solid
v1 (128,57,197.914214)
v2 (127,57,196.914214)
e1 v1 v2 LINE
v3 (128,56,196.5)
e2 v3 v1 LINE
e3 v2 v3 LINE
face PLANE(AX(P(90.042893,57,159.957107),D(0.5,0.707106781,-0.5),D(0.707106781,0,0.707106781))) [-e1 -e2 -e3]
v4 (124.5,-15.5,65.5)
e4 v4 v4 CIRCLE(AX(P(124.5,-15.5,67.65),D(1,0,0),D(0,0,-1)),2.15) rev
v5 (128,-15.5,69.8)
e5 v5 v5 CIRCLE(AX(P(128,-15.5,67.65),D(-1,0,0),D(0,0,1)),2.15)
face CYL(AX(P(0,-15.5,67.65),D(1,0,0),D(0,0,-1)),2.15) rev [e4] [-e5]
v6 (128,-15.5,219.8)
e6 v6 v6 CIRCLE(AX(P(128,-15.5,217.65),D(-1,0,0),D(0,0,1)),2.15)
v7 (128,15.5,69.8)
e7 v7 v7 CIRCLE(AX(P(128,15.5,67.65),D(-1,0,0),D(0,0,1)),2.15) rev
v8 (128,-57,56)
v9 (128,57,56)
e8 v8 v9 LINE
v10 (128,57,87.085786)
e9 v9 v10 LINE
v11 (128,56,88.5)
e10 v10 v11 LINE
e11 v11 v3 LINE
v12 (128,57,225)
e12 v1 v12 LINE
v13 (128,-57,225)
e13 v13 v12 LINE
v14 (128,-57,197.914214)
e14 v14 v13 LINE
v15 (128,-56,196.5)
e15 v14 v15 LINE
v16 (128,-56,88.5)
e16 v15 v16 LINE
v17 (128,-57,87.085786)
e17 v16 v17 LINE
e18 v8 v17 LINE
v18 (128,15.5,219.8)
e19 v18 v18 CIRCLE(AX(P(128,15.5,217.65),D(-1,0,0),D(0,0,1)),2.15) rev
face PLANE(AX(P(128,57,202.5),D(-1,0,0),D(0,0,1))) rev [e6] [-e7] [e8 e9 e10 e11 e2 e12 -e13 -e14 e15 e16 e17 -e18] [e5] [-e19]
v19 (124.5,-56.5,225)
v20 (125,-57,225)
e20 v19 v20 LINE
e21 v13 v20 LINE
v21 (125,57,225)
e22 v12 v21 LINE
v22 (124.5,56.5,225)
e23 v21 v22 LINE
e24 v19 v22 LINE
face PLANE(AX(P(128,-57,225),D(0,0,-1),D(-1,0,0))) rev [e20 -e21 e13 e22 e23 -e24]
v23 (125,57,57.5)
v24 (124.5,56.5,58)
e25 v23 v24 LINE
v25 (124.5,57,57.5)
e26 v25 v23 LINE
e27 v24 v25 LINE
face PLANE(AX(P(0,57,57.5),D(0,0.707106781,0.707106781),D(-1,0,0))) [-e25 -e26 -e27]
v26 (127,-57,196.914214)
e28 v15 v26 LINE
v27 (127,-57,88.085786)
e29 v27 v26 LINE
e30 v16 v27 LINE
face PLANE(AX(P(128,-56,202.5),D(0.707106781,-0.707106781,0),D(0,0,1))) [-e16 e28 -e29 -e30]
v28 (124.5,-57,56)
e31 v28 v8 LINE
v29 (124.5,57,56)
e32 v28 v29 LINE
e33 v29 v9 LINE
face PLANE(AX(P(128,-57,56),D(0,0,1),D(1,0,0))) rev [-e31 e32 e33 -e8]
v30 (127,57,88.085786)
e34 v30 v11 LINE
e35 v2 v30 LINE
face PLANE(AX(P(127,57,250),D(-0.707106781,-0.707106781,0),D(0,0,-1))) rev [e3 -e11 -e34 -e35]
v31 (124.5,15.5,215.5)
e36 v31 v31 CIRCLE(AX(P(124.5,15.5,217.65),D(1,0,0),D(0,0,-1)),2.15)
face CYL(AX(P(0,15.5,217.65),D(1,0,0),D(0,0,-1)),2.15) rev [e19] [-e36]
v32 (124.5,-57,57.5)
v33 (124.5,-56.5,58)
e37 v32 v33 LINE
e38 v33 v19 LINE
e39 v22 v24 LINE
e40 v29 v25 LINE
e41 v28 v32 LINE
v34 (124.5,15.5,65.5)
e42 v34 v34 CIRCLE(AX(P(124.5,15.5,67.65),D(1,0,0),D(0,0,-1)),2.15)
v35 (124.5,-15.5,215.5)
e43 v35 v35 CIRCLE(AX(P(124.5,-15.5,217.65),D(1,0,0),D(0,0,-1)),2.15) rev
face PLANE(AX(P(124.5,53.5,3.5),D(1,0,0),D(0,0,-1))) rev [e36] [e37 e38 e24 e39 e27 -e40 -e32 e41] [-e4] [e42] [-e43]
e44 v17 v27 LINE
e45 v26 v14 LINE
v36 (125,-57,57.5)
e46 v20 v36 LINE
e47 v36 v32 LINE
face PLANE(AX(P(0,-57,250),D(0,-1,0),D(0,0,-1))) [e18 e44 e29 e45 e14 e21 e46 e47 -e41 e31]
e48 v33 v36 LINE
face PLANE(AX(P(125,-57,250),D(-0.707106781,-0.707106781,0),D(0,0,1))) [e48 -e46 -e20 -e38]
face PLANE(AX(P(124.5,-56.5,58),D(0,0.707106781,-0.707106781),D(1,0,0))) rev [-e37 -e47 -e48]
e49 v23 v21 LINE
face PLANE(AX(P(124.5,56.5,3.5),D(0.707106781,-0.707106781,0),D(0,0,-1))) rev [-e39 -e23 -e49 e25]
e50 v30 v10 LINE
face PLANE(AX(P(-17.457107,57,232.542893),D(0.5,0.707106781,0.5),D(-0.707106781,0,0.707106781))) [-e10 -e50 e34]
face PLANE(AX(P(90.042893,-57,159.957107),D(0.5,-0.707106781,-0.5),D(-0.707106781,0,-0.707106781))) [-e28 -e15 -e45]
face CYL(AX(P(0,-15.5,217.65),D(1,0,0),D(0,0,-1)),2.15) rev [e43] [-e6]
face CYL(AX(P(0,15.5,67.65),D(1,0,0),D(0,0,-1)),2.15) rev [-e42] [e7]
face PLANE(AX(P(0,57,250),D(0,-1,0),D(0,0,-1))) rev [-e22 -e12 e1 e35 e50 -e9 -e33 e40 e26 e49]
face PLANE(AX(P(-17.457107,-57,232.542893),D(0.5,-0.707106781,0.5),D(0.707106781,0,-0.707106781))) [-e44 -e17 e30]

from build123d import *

# Parameters (mm, degrees)
SKETCH1_W                = 134
SKETCH1_H                = 57
BOSS_EXTRUDE1_DEPTH      = 250
SKETCH2_W                = 115
SKETCH2_H                = 53.5
CUT_EXTRUDE1_DEPTH       = 246.5
SKETCH3_W                = 115
SKETCH3_H                = 194
CUT_EXTRUDE2_DEPTH       = 3.5
SKETCH4_W                = 6
SKETCH4_H                = 120
CUT_EXTRUDE3_DEPTH       = 290.318163965
CHAMFER1_SIZE            = 6
SKETCH5_R                = 2.15
CUT_EXTRUDE4_DEPTH       = 134
SKETCH6_W                = 25
SKETCH6_H                = 4.5
BOSS_EXTRUDE2_DEPTH      = 115
SKETCH7_R                = 3.65
CUT_EXTRUDE5_DEPTH       = 3.6
CUT_EXTRUDE6_START       = -3.6
SKETCH8_R                = 3.65
CUT_EXTRUDE6_DEPTH       = 3.6
CHAMFER1_OF_MIRROR1_SIZE = 6
SKETCH9_R                = 1.65
CUT_EXTRUDE7_DEPTH       = 25
CHAMFER3_SIZE            = 0.5
CUT_EXTRUDE9_DEPTH       = 306.69919856
CHAMFER4_SIZE            = 0.5
SKETCH12_W               = 0.5
SKETCH12_H               = 2
BOSS_EXTRUDE3_DEPTH      = 114
CHAMFER5_SIZE            = 0.5


# Some blends are built 0.0001 mm under size
with BuildPart() as part:
    # Sketch1 → Boss-Extrude1 (new body)
    with BuildSketch(Plane.XY):
        with Locations((67, 28.5)):
            Rectangle(SKETCH1_W, SKETCH1_H)
    boss_extrude1 = extrude(amount=BOSS_EXTRUDE1_DEPTH)

    # Sketch2 → Cut-Extrude1 (cut)
    with BuildSketch(Plane.XY.offset(250)):
        with Locations((67, 26.75)):
            Rectangle(SKETCH2_W, SKETCH2_H)
    cut_extrude1 = extrude(amount=-CUT_EXTRUDE1_DEPTH, mode=Mode.SUBTRACT)

    # Sketch3 → Cut-Extrude2 (cut)
    with BuildSketch(Plane(origin=(0, 57, 0), x_dir=(1, 0, 0), z_dir=(0, 1, 0))):
        with Locations((67, -153)):
            Rectangle(SKETCH3_W, SKETCH3_H)
    cut_extrude2 = extrude(amount=-CUT_EXTRUDE2_DEPTH, mode=Mode.SUBTRACT)

    # Sketch4 → Cut-Extrude3 (cut, through all)
    with BuildSketch(Plane.XZ):
        with Locations((3, 142.5)):
            Rectangle(SKETCH4_W, SKETCH4_H)
        with Locations((131, 142.5)):
            Rectangle(SKETCH4_W, SKETCH4_H)
    cut_extrude3 = extrude(amount=-CUT_EXTRUDE3_DEPTH, mode=Mode.SUBTRACT)

    # Chamfer1
    chamfer1_edges = [part.edges().sort_by_distance(p)[0] for p in [
        (6, 28.5, 202.5),
        (6, 28.5, 82.5),
        (128, 28.5, 82.5),
        (128, 28.5, 202.5),
    ]]
    chamfer(chamfer1_edges, length=CHAMFER1_SIZE - 0.0001)  # a hair under: the kernel refuses the full size

    # Sketch5 → Cut-Extrude4 (cut)
    with BuildSketch(Plane(origin=(134, 0, 0), x_dir=(0, 0, -1), z_dir=(1, 0, 0))):
        with Locations((-217.65, 15.5)):
            Circle(SKETCH5_R)
        with Locations((-67.65, 15.5)):
            Circle(SKETCH5_R)
    cut_extrude4 = extrude(amount=-CUT_EXTRUDE4_DEPTH, mode=Mode.SUBTRACT)

    # Sketch6 → Boss-Extrude2 (add)
    with BuildSketch(Plane(origin=(9.5, 0, 0), x_dir=(0, 0, -1), z_dir=(1, 0, 0))):
        with Locations((-237.5, 2.25)):
            Rectangle(SKETCH6_W, SKETCH6_H)
    boss_extrude2 = extrude(amount=BOSS_EXTRUDE2_DEPTH)

    # Sketch7 → Cut-Extrude5 (cut)
    with BuildSketch(Plane(origin=(134, 0, 0), x_dir=(0, 0, -1), z_dir=(1, 0, 0))):
        with Locations((-217.65, 15.5)):
            Circle(SKETCH7_R)
        with Locations((-67.65, 15.5)):
            Circle(SKETCH7_R)
    cut_extrude5 = extrude(amount=-CUT_EXTRUDE5_DEPTH, mode=Mode.SUBTRACT)

    # Sketch8 → Cut-Extrude6 (cut)
    with BuildSketch(Plane.ZY.offset(CUT_EXTRUDE6_START)):
        with Locations(Location((217.65, 15.5, 0), (0, 0, 180))):
            Circle(SKETCH8_R)
        with Locations(Location((67.65, 15.5, 0), (0, 0, 180))):
            Circle(SKETCH8_R)
    cut_extrude6 = extrude(amount=CUT_EXTRUDE6_DEPTH, mode=Mode.SUBTRACT)


with BuildPart() as mirror1_1:
    # Mirror1: Boss-Extrude1 across plane
    add(boss_extrude1.mirror(Plane.ZX))

    # Mirror1 2: Cut-Extrude1, Cut-Extrude2, Cut-Extrude3, Cut-Extrude4 across plane
    add(cut_extrude1.mirror(Plane.ZX), mode=Mode.SUBTRACT)
    add(cut_extrude2.mirror(Plane.ZX), mode=Mode.SUBTRACT)
    add(cut_extrude3.mirror(Plane.ZX), mode=Mode.SUBTRACT)
    add(cut_extrude4.mirror(Plane.ZX), mode=Mode.SUBTRACT)

    # Mirror1 4: Cut-Extrude5, Cut-Extrude6 across plane
    add(cut_extrude5.mirror(Plane.ZX), mode=Mode.SUBTRACT)
    add(cut_extrude6.mirror(Plane.ZX), mode=Mode.SUBTRACT)

    # Chamfer1 of Mirror1
    chamfer1_of_mirror1_edges = [mirror1_1.edges().sort_by_distance(p)[0] for p in [
        (6, -28.5, 202.5),
        (6, -28.5, 82.5),
        (128, -28.5, 82.5),
        (128, -28.5, 202.5),
    ]]
    chamfer(chamfer1_of_mirror1_edges, length=CHAMFER1_OF_MIRROR1_SIZE - 0.0001)  # a hair under: the kernel refuses the full size


with BuildPart() as mirror1_3_1:
    # Mirror1 3: Boss-Extrude2 across plane
    add(boss_extrude2.mirror(Plane.ZX))


with BuildPart() as part_1:
    add(part.part)

    # Mirror1 united with what the copies touc: union Mirror1_1, Mirror1 3_1
    add(mirror1_1.part)
    add(mirror1_3_1.part)

    # Sketch9 → Cut-Extrude7 (cut)
    with BuildSketch(Plane.XY.offset(250)):
        with Locations((25, 0)):
            Circle(SKETCH9_R)
        with Locations((109, 0)):
            Circle(SKETCH9_R)
    extrude(amount=-CUT_EXTRUDE7_DEPTH, mode=Mode.SUBTRACT)

    # Chamfer2
    # the kernel refuses this chamfer: 1 mm, written as the material it takes off along each edge
    with BuildSketch(Plane(origin=(133.333333333, -56.333333333, 0.666666667), x_dir=(-0.7071067811865475, -0.7071067811865475, 0), z_dir=(0.5773502691896257, -0.5773502691896258, -0.5773502691896258))) as chamfer2_piece_1:
        Polygon((-0.707106781, -0.40824829), (0.707106781, -0.40824829), (0, 0.816496581), align=None)
    extrude(amount=1.270170592, mode=Mode.SUBTRACT)
    with BuildSketch(Plane(origin=(0.666666667, -56.333333333, 0.666666667), x_dir=(0.7071067811865475, -0.7071067811865475, 0), z_dir=(-0.5773502691896258, -0.5773502691896258, -0.5773502691896258)), Plane(origin=(133.333333333, 56.333333333, 0.666666667), x_dir=(-0.7071067811865475, 0.7071067811865475, 0), z_dir=(0.5773502691896257, 0.5773502691896258, -0.5773502691896258)), Plane(origin=(0.666666667, 56.333333333, 0.666666667), x_dir=(-0.7071067811865475, -0.7071067811865475, 0), z_dir=(-0.5773502691896257, 0.5773502691896258, -0.5773502691896257))) as chamfer2_piece_2:
        Polygon((-0.707106781, 0.40824829), (0.707106781, 0.40824829), (0, -0.816496581), align=None)
    extrude(amount=1.270170592, mode=Mode.SUBTRACT)
    with BuildSketch(Plane(origin=(0, -57, 199.928317012), x_dir=(0.9996219169112968, -0.02749587661058908, 0), z_dir=(0, 0, 1)), Plane(origin=(134, 57, 199.928317012), x_dir=(-0.9996219169112968, 0.027495876610589196, 0), z_dir=(0, 0, 1))) as chamfer2_piece_3:
        with BuildLine():
            Line((1.028673195, 0), (-0.056547155, 1.027117794))
            Line((-0.056547155, 1.027117794), (-0.076539593, 1.026567876))
            ThreePointArc((-0.076539593, 1.026567876), (-0.034129227, 0.51339783), (-0.019992438, -0.000549918))
            Line((-0.019992438, -0.000549918), (0.000549918, -0.019992438))
            ThreePointArc((0.000549918, -0.019992438), (0.514497665, -0.00585565), (1.029223113, -0.019992438))
            Line((1.029223113, -0.019992438), (1.028673195, 0))
        make_face()
    extrude(amount=52.643365976, mode=Mode.SUBTRACT)
    with BuildSketch(Plane(origin=(134, -57, 199.928317012), x_dir=(-0.9996219169112968, -0.027495876610589196, 0), z_dir=(0, 0, 1)), Plane(origin=(0, 57, 199.928317012), x_dir=(0.9996219169112968, 0.02749587661058908, 0), z_dir=(0, 0, 1))) as chamfer2_piece_4:
        with BuildLine():
            Line((1.028673195, 0), (-0.056547155, -1.027117794))
            Line((-0.056547155, -1.027117794), (-0.076539593, -1.026567876))
            ThreePointArc((-0.076539593, -1.026567876), (-0.034129227, -0.51339783), (-0.019992438, 0.000549918))
            Line((-0.019992438, 0.000549918), (0.000549918, 0.019992438))
            ThreePointArc((0.000549918, 0.019992438), (0.514497665, 0.00585565), (1.029223113, 0.019992438))
            Line((1.029223113, 0.019992438), (1.028673195, 0))
        make_face()
    extrude(amount=52.643365976, mode=Mode.SUBTRACT)
    with BuildSketch(Plane(origin=(136.571682988, -57, 0), x_dir=(0, -0.02749587661058908, 0.9996219169112968), z_dir=(-1, 0, 0))) as chamfer2_piece_5:
        with BuildLine():
            Line((1.028673195, 0), (-0.056547155, 1.027117794))
            Line((-0.056547155, 1.027117794), (-0.076539593, 1.026567876))
            ThreePointArc((-0.076539593, 1.026567876), (-0.034129227, 0.51339783), (-0.019992438, -0.000549918))
            Line((-0.019992438, -0.000549918), (0.000549918, -0.019992438))
            ThreePointArc((0.000549918, -0.019992438), (0.514497665, -0.00585565), (1.029223113, -0.019992438))
            Line((1.029223113, -0.019992438), (1.028673195, 0))
        make_face()
    extrude(amount=139.143365976, mode=Mode.SUBTRACT)
    with BuildSketch(Plane(origin=(134, -57, -2.571682988), x_dir=(0.027495876610582105, 0.999621916911297, 0), z_dir=(0, 0, 1)), Plane(origin=(0, -57, -2.571682988), x_dir=(0.9996219169112968, -0.02749587661058908, 0), z_dir=(0, 0, 1))) as chamfer2_piece_6:
        with BuildLine():
            Line((1.028673195, 0), (-0.056547155, 1.027117794))
            Line((-0.056547155, 1.027117794), (-0.076539593, 1.026567876))
            ThreePointArc((-0.076539593, 1.026567876), (-0.034129227, 0.51339783), (-0.019992438, -0.000549918))
            Line((-0.019992438, -0.000549918), (0.000549918, -0.019992438))
            ThreePointArc((0.000549918, -0.019992438), (0.514497665, -0.00585565), (1.029223113, -0.019992438))
            Line((1.029223113, -0.019992438), (1.028673195, 0))
        make_face()
    extrude(amount=87.643365976, mode=Mode.SUBTRACT)
    with BuildSketch(Plane(origin=(6, -57, 85.928217012), x_dir=(0.9996219169112968, -0.027495876610589075, 0), z_dir=(0, 0, 1))) as chamfer2_piece_7_section:
        with BuildLine():
            Line((1.028673195, 0), (-0.056547155, 1.027117794))
            Line((-0.056547155, 1.027117794), (-0.076539593, 1.026567876))
            ThreePointArc((-0.076539593, 1.026567876), (-0.034129227, 0.51339783), (-0.019992438, -0.000549918))
            Line((-0.019992438, -0.000549918), (0.000549918, -0.019992438))
            ThreePointArc((0.000549918, -0.019992438), (0.514497665, -0.00585565), (1.029223113, -0.019992438))
            Line((1.029223113, -0.019992438), (1.028673195, 0))
        make_face()
    chamfer2_piece_7 = extrude(amount=113.143565976, mode=Mode.PRIVATE)
    chamfer2_piece_7 = split(chamfer2_piece_7, bisect_by=Plane(origin=(33.164355215, -56.669573831, 115.664255215), z_dir=(-0.7071067811865475, 0, 0.7071067811865477)), keep=Keep.TOP, mode=Mode.PRIVATE)
    chamfer2_piece_7 = split(chamfer2_piece_7, bisect_by=Plane(origin=(33.164355215, -56.669573831, 169.335744785), z_dir=(-0.7071067811865472, 0, -0.7071067811865478)), keep=Keep.TOP, mode=Mode.PRIVATE)
    add(chamfer2_piece_7, mode=Mode.SUBTRACT)
    with BuildSketch(Plane(origin=(128, -57, 85.928217012), x_dir=(0.027495876610582105, 0.999621916911297, 0), z_dir=(0, 0, 1))) as chamfer2_piece_8_section:
        with BuildLine():
            Line((1.028673195, 0), (-0.056547155, 1.027117794))
            Line((-0.056547155, 1.027117794), (-0.076539593, 1.026567876))
            ThreePointArc((-0.076539593, 1.026567876), (-0.034129227, 0.51339783), (-0.019992438, -0.000549918))
            Line((-0.019992438, -0.000549918), (0.000549918, -0.019992438))
            ThreePointArc((0.000549918, -0.019992438), (0.514497665, -0.00585565), (1.029223113, -0.019992438))
            Line((1.029223113, -0.019992438), (1.028673195, 0))
        make_face()
    chamfer2_piece_8 = extrude(amount=113.143565976, mode=Mode.PRIVATE)
    chamfer2_piece_8 = split(chamfer2_piece_8, bisect_by=Plane(origin=(100.835644785, -56.669573831, 115.664255215), z_dir=(0.7071067811865476, 0, 0.7071067811865476)), keep=Keep.TOP, mode=Mode.PRIVATE)
    chamfer2_piece_8 = split(chamfer2_piece_8, bisect_by=Plane(origin=(100.835644785, -56.669573831, 169.335744785), z_dir=(0.7071067811865476, 0, -0.7071067811865476)), keep=Keep.TOP, mode=Mode.PRIVATE)
    add(chamfer2_piece_8, mode=Mode.SUBTRACT)
    with BuildSketch(Plane(origin=(-1.81835448, -57, 204.31845448), x_dir=(0.7068394360706731, -0.027495876610588672, 0.7068394360706738), z_dir=(0.7071067811865479, 0, -0.7071067811865474))) as chamfer2_piece_9_section:
        with BuildLine():
            Line((1.028673195, 0), (-0.056547155, -1.027117794))
            Line((-0.056547155, -1.027117794), (-0.076539593, -1.026567876))
            ThreePointArc((-0.076539593, -1.026567876), (-0.034129227, -0.51339783), (-0.019992438, 0.000549918))
            Line((-0.019992438, 0.000549918), (0.000549918, 0.019992438))
            ThreePointArc((0.000549918, 0.019992438), (0.514497665, 0.00585565), (1.029223113, 0.019992438))
            Line((1.029223113, 0.019992438), (1.028673195, 0))
        make_face()
    chamfer2_piece_9 = extrude(amount=13.628505929, mode=Mode.PRIVATE)
    chamfer2_piece_9 = split(chamfer2_piece_9, bisect_by=Plane(origin=(6, -56.681906875, 203.533564865), z_dir=(-1, 0, 0)), keep=Keep.TOP, mode=Mode.PRIVATE)
    add(chamfer2_piece_9, mode=Mode.SUBTRACT)
    with BuildSketch(Plane(origin=(7.81845448, -57, 90.31835448), x_dir=(0.7068394360706733, -0.027495876610588946, -0.7068394360706736), z_dir=(-0.7071067811865477, 0, -0.7071067811865475))) as chamfer2_piece_10_section:
        with BuildLine():
            Line((1.028673195, 0), (-0.056547155, -1.027117794))
            Line((-0.056547155, -1.027117794), (-0.076539593, -1.026567876))
            ThreePointArc((-0.076539593, -1.026567876), (-0.034129227, -0.51339783), (-0.019992438, 0.000549918))
            Line((-0.019992438, 0.000549918), (0.000549918, 0.019992438))
            ThreePointArc((0.000549918, 0.019992438), (0.514497665, 0.00585565), (1.029223113, 0.019992438))
            Line((1.029223113, 0.019992438), (1.028673195, 0))
        make_face()
    chamfer2_piece_10 = extrude(amount=13.628505929, mode=Mode.PRIVATE)
    chamfer2_piece_10 = split(chamfer2_piece_10, bisect_by=Plane(origin=(6, -56.661529994, 85.278226705), z_dir=(-1, 0, 0)), keep=Keep.TOP, mode=Mode.PRIVATE)
    add(chamfer2_piece_10, mode=Mode.SUBTRACT)
    with BuildSketch(Plane(origin=(135.81835448, -57, 80.68154552), x_dir=(0.01944252080601719, 0.9996219169112965, 0.01944252080601719), z_dir=(-0.7071067811865476, 0, 0.7071067811865476))) as chamfer2_piece_11_section:
        with BuildLine():
            Line((1.028673195, 0), (-0.056547155, 1.027117794))
            Line((-0.056547155, 1.027117794), (-0.076539593, 1.026567876))
            ThreePointArc((-0.076539593, 1.026567876), (-0.034129227, 0.51339783), (-0.019992438, -0.000549918))
            Line((-0.019992438, -0.000549918), (0.000549918, -0.019992438))
            ThreePointArc((0.000549918, -0.019992438), (0.514497665, -0.00585565), (1.029223113, -0.019992438))
            Line((1.029223113, -0.019992438), (1.028673195, 0))
        make_face()
    chamfer2_piece_11 = extrude(amount=13.628505929, mode=Mode.PRIVATE)
    chamfer2_piece_11 = split(chamfer2_piece_11, bisect_by=Plane(origin=(128, -56.681906875, 81.466435135), z_dir=(1, 0, 0)), keep=Keep.TOP, mode=Mode.PRIVATE)
    add(chamfer2_piece_11, mode=Mode.SUBTRACT)
    with BuildSketch(Plane(origin=(126.18154552, -57, 194.68164552), x_dir=(-0.7068394360706735, -0.027495876610588745, 0.7068394360706735), z_dir=(0.7071067811865476, 0, 0.7071067811865476))) as chamfer2_piece_12_section:
        with BuildLine():
            Line((1.028673195, 0), (-0.056547155, -1.027117794))
            Line((-0.056547155, -1.027117794), (-0.076539593, -1.026567876))
            ThreePointArc((-0.076539593, -1.026567876), (-0.034129227, -0.51339783), (-0.019992438, 0.000549918))
            Line((-0.019992438, 0.000549918), (0.000549918, 0.019992438))
            ThreePointArc((0.000549918, 0.019992438), (0.514497665, 0.00585565), (1.029223113, 0.019992438))
            Line((1.029223113, 0.019992438), (1.028673195, 0))
        make_face()
    chamfer2_piece_12 = extrude(amount=13.628505929, mode=Mode.PRIVATE)
    chamfer2_piece_12 = split(chamfer2_piece_12, bisect_by=Plane(origin=(128, -56.661529994, 199.721773295), z_dir=(1, 0, 0)), keep=Keep.TOP, mode=Mode.PRIVATE)
    add(chamfer2_piece_12, mode=Mode.SUBTRACT)
    with BuildSketch(Plane(origin=(134, 57, -2.571682988), x_dir=(0.027495876610582105, -0.999621916911297, 0), z_dir=(0, 0, 1)), Plane(origin=(0, 57, -2.571682988), x_dir=(0.9996219169112968, 0.02749587661058908, 0), z_dir=(0, 0, 1))) as chamfer2_piece_13:
        with BuildLine():
            Line((1.028673195, 0), (-0.056547155, -1.027117794))
            Line((-0.056547155, -1.027117794), (-0.076539593, -1.026567876))
            ThreePointArc((-0.076539593, -1.026567876), (-0.034129227, -0.51339783), (-0.019992438, 0.000549918))
            Line((-0.019992438, 0.000549918), (0.000549918, 0.019992438))
            ThreePointArc((0.000549918, 0.019992438), (0.514497665, 0.00585565), (1.029223113, 0.019992438))
            Line((1.029223113, 0.019992438), (1.028673195, 0))
        make_face()
    extrude(amount=87.643365976, mode=Mode.SUBTRACT)
    with BuildSketch(Plane(origin=(136.571682988, 57, 0), x_dir=(0, 0.02749587661058908, 0.9996219169112968), z_dir=(-1, 0, 0))) as chamfer2_piece_14:
        with BuildLine():
            Line((1.028673195, 0), (-0.056547155, -1.027117794))
            Line((-0.056547155, -1.027117794), (-0.076539593, -1.026567876))
            ThreePointArc((-0.076539593, -1.026567876), (-0.034129227, -0.51339783), (-0.019992438, 0.000549918))
            Line((-0.019992438, 0.000549918), (0.000549918, 0.019992438))
            ThreePointArc((0.000549918, 0.019992438), (0.514497665, 0.00585565), (1.029223113, 0.019992438))
            Line((1.029223113, 0.019992438), (1.028673195, 0))
        make_face()
    extrude(amount=139.143365976, mode=Mode.SUBTRACT)
    with BuildSketch(Plane(origin=(134, -59.571682988, 0), x_dir=(0.027495876610582174, 0, 0.9996219169112968), z_dir=(0, 1, 0)), Plane(origin=(0, -59.571682988, 0), x_dir=(0.9996219169112968, 0, -0.027495876610586372), z_dir=(0, 1, 0))) as chamfer2_piece_15:
        with BuildLine():
            Line((1.028673195, 0), (-0.056547155, -1.027117794))
            Line((-0.056547155, -1.027117794), (-0.076539593, -1.026567876))
            ThreePointArc((-0.076539593, -1.026567876), (-0.034129227, -0.51339783), (-0.019992438, 0.000549918))
            Line((-0.019992438, 0.000549918), (0.000549918, 0.019992438))
            ThreePointArc((0.000549918, 0.019992438), (0.514497665, 0.00585565), (1.029223113, 0.019992438))
            Line((1.029223113, 0.019992438), (1.028673195, 0))
        make_face()
    extrude(amount=119.143365976, mode=Mode.SUBTRACT)
    with BuildSketch(Plane(origin=(6, 57, 199.071782988), x_dir=(0.9996219169112968, 0.027495876610589075, 0), z_dir=(0, 0, -1))) as chamfer2_piece_16_section:
        with BuildLine():
            Line((1.028673195, 0), (-0.056547155, 1.027117794))
            Line((-0.056547155, 1.027117794), (-0.076539593, 1.026567876))
            ThreePointArc((-0.076539593, 1.026567876), (-0.034129227, 0.51339783), (-0.019992438, -0.000549918))
            Line((-0.019992438, -0.000549918), (0.000549918, -0.019992438))
            ThreePointArc((0.000549918, -0.019992438), (0.514497665, -0.00585565), (1.029223113, -0.019992438))
            Line((1.029223113, -0.019992438), (1.028673195, 0))
        make_face()
    chamfer2_piece_16 = extrude(amount=113.143565976, mode=Mode.PRIVATE)
    chamfer2_piece_16 = split(chamfer2_piece_16, bisect_by=Plane(origin=(33.164355215, 56.669573831, 115.664255215), z_dir=(-0.7071067811865475, 0, 0.7071067811865477)), keep=Keep.TOP, mode=Mode.PRIVATE)
    chamfer2_piece_16 = split(chamfer2_piece_16, bisect_by=Plane(origin=(33.164355215, 56.669573831, 169.335744785), z_dir=(-0.7071067811865472, 0, -0.7071067811865478)), keep=Keep.TOP, mode=Mode.PRIVATE)
    add(chamfer2_piece_16, mode=Mode.SUBTRACT)
    with BuildSketch(Plane(origin=(128, 57, 199.071782988), x_dir=(-0.9996219169112968, 0.027495876610589196, 0), z_dir=(0, 0, -1))) as chamfer2_piece_17_section:
        with BuildLine():
            Line((1.028673195, 0), (-0.056547155, -1.027117794))
            Line((-0.056547155, -1.027117794), (-0.076539593, -1.026567876))
            ThreePointArc((-0.076539593, -1.026567876), (-0.034129227, -0.51339783), (-0.019992438, 0.000549918))
            Line((-0.019992438, 0.000549918), (0.000549918, 0.019992438))
            ThreePointArc((0.000549918, 0.019992438), (0.514497665, 0.00585565), (1.029223113, 0.019992438))
            Line((1.029223113, 0.019992438), (1.028673195, 0))
        make_face()
    chamfer2_piece_17 = extrude(amount=113.143565976, mode=Mode.PRIVATE)
    chamfer2_piece_17 = split(chamfer2_piece_17, bisect_by=Plane(origin=(100.835644785, 56.669573831, 115.664255215), z_dir=(0.7071067811865476, 0, 0.7071067811865476)), keep=Keep.TOP, mode=Mode.PRIVATE)
    chamfer2_piece_17 = split(chamfer2_piece_17, bisect_by=Plane(origin=(100.835644785, 56.669573831, 169.335744785), z_dir=(0.7071067811865476, 0, -0.7071067811865476)), keep=Keep.TOP, mode=Mode.PRIVATE)
    add(chamfer2_piece_17, mode=Mode.SUBTRACT)
    with BuildSketch(Plane(origin=(-1.81835448, 57, 204.31845448), x_dir=(0.7068394360706731, 0.027495876610588672, 0.7068394360706738), z_dir=(0.7071067811865479, 0, -0.7071067811865474))) as chamfer2_piece_18_section:
        with BuildLine():
            Line((1.028673195, 0), (-0.056547155, 1.027117794))
            Line((-0.056547155, 1.027117794), (-0.076539593, 1.026567876))
            ThreePointArc((-0.076539593, 1.026567876), (-0.034129227, 0.51339783), (-0.019992438, -0.000549918))
            Line((-0.019992438, -0.000549918), (0.000549918, -0.019992438))
            ThreePointArc((0.000549918, -0.019992438), (0.514497665, -0.00585565), (1.029223113, -0.019992438))
            Line((1.029223113, -0.019992438), (1.028673195, 0))
        make_face()
    chamfer2_piece_18 = extrude(amount=13.628505929, mode=Mode.PRIVATE)
    chamfer2_piece_18 = split(chamfer2_piece_18, bisect_by=Plane(origin=(6, 56.681906875, 203.533564865), z_dir=(-1, 0, 0)), keep=Keep.TOP, mode=Mode.PRIVATE)
    add(chamfer2_piece_18, mode=Mode.SUBTRACT)
    with BuildSketch(Plane(origin=(7.81845448, 57, 90.31835448), x_dir=(0.7068394360706733, 0.027495876610588946, -0.7068394360706736), z_dir=(-0.7071067811865477, 0, -0.7071067811865475))) as chamfer2_piece_19_section:
        with BuildLine():
            Line((1.028673195, 0), (-0.056547155, 1.027117794))
            Line((-0.056547155, 1.027117794), (-0.076539593, 1.026567876))
            ThreePointArc((-0.076539593, 1.026567876), (-0.034129227, 0.51339783), (-0.019992438, -0.000549918))
            Line((-0.019992438, -0.000549918), (0.000549918, -0.019992438))
            ThreePointArc((0.000549918, -0.019992438), (0.514497665, -0.00585565), (1.029223113, -0.019992438))
            Line((1.029223113, -0.019992438), (1.028673195, 0))
        make_face()
    chamfer2_piece_19 = extrude(amount=13.628505929, mode=Mode.PRIVATE)
    chamfer2_piece_19 = split(chamfer2_piece_19, bisect_by=Plane(origin=(6, 56.661529994, 85.278226705), z_dir=(-1, 0, 0)), keep=Keep.TOP, mode=Mode.PRIVATE)
    add(chamfer2_piece_19, mode=Mode.SUBTRACT)
    with BuildSketch(Plane(origin=(135.81835448, 57, 80.68154552), x_dir=(0.01944252080601719, -0.9996219169112965, 0.01944252080601719), z_dir=(-0.7071067811865476, 0, 0.7071067811865476))) as chamfer2_piece_20_section:
        with BuildLine():
            Line((1.028673195, 0), (-0.056547155, -1.027117794))
            Line((-0.056547155, -1.027117794), (-0.076539593, -1.026567876))
            ThreePointArc((-0.076539593, -1.026567876), (-0.034129227, -0.51339783), (-0.019992438, 0.000549918))
            Line((-0.019992438, 0.000549918), (0.000549918, 0.019992438))
            ThreePointArc((0.000549918, 0.019992438), (0.514497665, 0.00585565), (1.029223113, 0.019992438))
            Line((1.029223113, 0.019992438), (1.028673195, 0))
        make_face()
    chamfer2_piece_20 = extrude(amount=13.628505929, mode=Mode.PRIVATE)
    chamfer2_piece_20 = split(chamfer2_piece_20, bisect_by=Plane(origin=(128, 56.681906875, 81.466435135), z_dir=(1, 0, 0)), keep=Keep.TOP, mode=Mode.PRIVATE)
    add(chamfer2_piece_20, mode=Mode.SUBTRACT)
    with BuildSketch(Plane(origin=(126.18154552, 57, 194.68164552), x_dir=(-0.7068394360706735, 0.027495876610588745, 0.7068394360706735), z_dir=(0.7071067811865476, 0, 0.7071067811865476))) as chamfer2_piece_21_section:
        with BuildLine():
            Line((1.028673195, 0), (-0.056547155, 1.027117794))
            Line((-0.056547155, 1.027117794), (-0.076539593, 1.026567876))
            ThreePointArc((-0.076539593, 1.026567876), (-0.034129227, 0.51339783), (-0.019992438, -0.000549918))
            Line((-0.019992438, -0.000549918), (0.000549918, -0.019992438))
            ThreePointArc((0.000549918, -0.019992438), (0.514497665, -0.00585565), (1.029223113, -0.019992438))
            Line((1.029223113, -0.019992438), (1.028673195, 0))
        make_face()
    chamfer2_piece_21 = extrude(amount=13.628505929, mode=Mode.PRIVATE)
    chamfer2_piece_21 = split(chamfer2_piece_21, bisect_by=Plane(origin=(128, 56.661529994, 199.721773295), z_dir=(1, 0, 0)), keep=Keep.TOP, mode=Mode.PRIVATE)
    add(chamfer2_piece_21, mode=Mode.SUBTRACT)
    with BuildSketch(Plane(origin=(7.81845448, -57, 90.31835448), x_dir=(0.7068394360706733, -0.027495876610588946, -0.7068394360706736), z_dir=(-0.7071067811865477, 0, -0.7071067811865475))) as chamfer2_piece_22a_section:
        with BuildLine():
            Line((1.028673195, 0), (-0.056547155, -1.027117794))
            Line((-0.056547155, -1.027117794), (-0.076539593, -1.026567876))
            ThreePointArc((-0.076539593, -1.026567876), (-0.034129227, -0.51339783), (-0.019992438, 0.000549918))
            Line((-0.019992438, 0.000549918), (0.000549918, 0.019992438))
            ThreePointArc((0.000549918, 0.019992438), (0.514497665, 0.00585565), (1.029223113, 0.019992438))
            Line((1.029223113, 0.019992438), (1.028673195, 0))
        make_face()
    chamfer2_piece_22a = extrude(amount=13.628505929, mode=Mode.PRIVATE)
    chamfer2_piece_22a = split(chamfer2_piece_22a, bisect_by=Plane(origin=(6, -56.681906875, 89.036114365), z_dir=(1, 0, 0)), keep=Keep.TOP, mode=Mode.PRIVATE)
    with BuildSketch(Plane(origin=(6, -57, 85.928217012), x_dir=(0.9996219169112968, -0.027495876610589075, 0), z_dir=(0, 0, 1))) as chamfer2_piece_22b_section:
        with BuildLine():
            Line((1.028673195, 0), (-0.056547155, 1.027117794))
            Line((-0.056547155, 1.027117794), (-0.076539593, 1.026567876))
            ThreePointArc((-0.076539593, 1.026567876), (-0.034129227, 0.51339783), (-0.019992438, -0.000549918))
            Line((-0.019992438, -0.000549918), (0.000549918, -0.019992438))
            ThreePointArc((0.000549918, -0.019992438), (0.514497665, -0.00585565), (1.029223113, -0.019992438))
            Line((1.029223113, -0.019992438), (1.028673195, 0))
        make_face()
    chamfer2_piece_22b = extrude(amount=113.143565976, mode=Mode.PRIVATE)
    chamfer2_piece_22b = split(chamfer2_piece_22b, bisect_by=Plane(origin=(5.620839187, -56.681906875, 88.120739187), z_dir=(0.7071067811865475, 0, -0.7071067811865477)), keep=Keep.TOP, mode=Mode.PRIVATE)
    chamfer2_piece_22 = chamfer2_piece_22a & chamfer2_piece_22b
    add(chamfer2_piece_22, mode=Mode.SUBTRACT)
    with BuildSketch(Plane(origin=(6, -57, 85.928217012), x_dir=(0.9996219169112968, -0.027495876610589075, 0), z_dir=(0, 0, 1))) as chamfer2_piece_23a_section:
        with BuildLine():
            Line((1.028673195, 0), (-0.056547155, 1.027117794))
            Line((-0.056547155, 1.027117794), (-0.076539593, 1.026567876))
            ThreePointArc((-0.076539593, 1.026567876), (-0.034129227, 0.51339783), (-0.019992438, -0.000549918))
            Line((-0.019992438, -0.000549918), (0.000549918, -0.019992438))
            ThreePointArc((0.000549918, -0.019992438), (0.514497665, -0.00585565), (1.029223113, -0.019992438))
            Line((1.029223113, -0.019992438), (1.028673195, 0))
        make_face()
    chamfer2_piece_23a = extrude(amount=113.143565976, mode=Mode.PRIVATE)
    chamfer2_piece_23a = split(chamfer2_piece_23a, bisect_by=Plane(origin=(5.620839187, -56.681906875, 196.879260813), z_dir=(0.7071067811865472, 0, 0.7071067811865478)), keep=Keep.TOP, mode=Mode.PRIVATE)
    with BuildSketch(Plane(origin=(-1.81835448, -57, 204.31845448), x_dir=(0.7068394360706731, -0.027495876610588672, 0.7068394360706738), z_dir=(0.7071067811865479, 0, -0.7071067811865474))) as chamfer2_piece_23b_section:
        with BuildLine():
            Line((1.028673195, 0), (-0.056547155, -1.027117794))
            Line((-0.056547155, -1.027117794), (-0.076539593, -1.026567876))
            ThreePointArc((-0.076539593, -1.026567876), (-0.034129227, -0.51339783), (-0.019992438, 0.000549918))
            Line((-0.019992438, 0.000549918), (0.000549918, 0.019992438))
            ThreePointArc((0.000549918, 0.019992438), (0.514497665, 0.00585565), (1.029223113, 0.019992438))
            Line((1.029223113, 0.019992438), (1.028673195, 0))
        make_face()
    chamfer2_piece_23b = extrude(amount=13.628505929, mode=Mode.PRIVATE)
    chamfer2_piece_23b = split(chamfer2_piece_23b, bisect_by=Plane(origin=(6, -56.681906875, 195.963885635), z_dir=(1, 0, 0)), keep=Keep.TOP, mode=Mode.PRIVATE)
    chamfer2_piece_23 = chamfer2_piece_23a & chamfer2_piece_23b
    add(chamfer2_piece_23, mode=Mode.SUBTRACT)
    with BuildSketch(Plane(origin=(135.81835448, -57, 80.68154552), x_dir=(0.01944252080601719, 0.9996219169112965, 0.01944252080601719), z_dir=(-0.7071067811865476, 0, 0.7071067811865476))) as chamfer2_piece_24a_section:
        with BuildLine():
            Line((1.028673195, 0), (-0.056547155, 1.027117794))
            Line((-0.056547155, 1.027117794), (-0.076539593, 1.026567876))
            ThreePointArc((-0.076539593, 1.026567876), (-0.034129227, 0.51339783), (-0.019992438, -0.000549918))
            Line((-0.019992438, -0.000549918), (0.000549918, -0.019992438))
            ThreePointArc((0.000549918, -0.019992438), (0.514497665, -0.00585565), (1.029223113, -0.019992438))
            Line((1.029223113, -0.019992438), (1.028673195, 0))
        make_face()
    chamfer2_piece_24a = extrude(amount=13.628505929, mode=Mode.PRIVATE)
    chamfer2_piece_24a = split(chamfer2_piece_24a, bisect_by=Plane(origin=(128, -56.681906875, 89.036114365), z_dir=(-1, 0, 0)), keep=Keep.TOP, mode=Mode.PRIVATE)
    with BuildSketch(Plane(origin=(128, -57, 85.928217012), x_dir=(0.027495876610582105, 0.999621916911297, 0), z_dir=(0, 0, 1))) as chamfer2_piece_24b_section:
        with BuildLine():
            Line((1.028673195, 0), (-0.056547155, 1.027117794))
            Line((-0.056547155, 1.027117794), (-0.076539593, 1.026567876))
            ThreePointArc((-0.076539593, 1.026567876), (-0.034129227, 0.51339783), (-0.019992438, -0.000549918))
            Line((-0.019992438, -0.000549918), (0.000549918, -0.019992438))
            ThreePointArc((0.000549918, -0.019992438), (0.514497665, -0.00585565), (1.029223113, -0.019992438))
            Line((1.029223113, -0.019992438), (1.028673195, 0))
        make_face()
    chamfer2_piece_24b = extrude(amount=113.143565976, mode=Mode.PRIVATE)
    chamfer2_piece_24b = split(chamfer2_piece_24b, bisect_by=Plane(origin=(128.379160813, -56.681906875, 88.120739187), z_dir=(-0.7071067811865476, 0, -0.7071067811865476)), keep=Keep.TOP, mode=Mode.PRIVATE)
    chamfer2_piece_24 = chamfer2_piece_24a & chamfer2_piece_24b
    add(chamfer2_piece_24, mode=Mode.SUBTRACT)
    with BuildSketch(Plane(origin=(128, -57, 85.928217012), x_dir=(0.027495876610582105, 0.999621916911297, 0), z_dir=(0, 0, 1))) as chamfer2_piece_25a_section:
        with BuildLine():
            Line((1.028673195, 0), (-0.056547155, 1.027117794))
            Line((-0.056547155, 1.027117794), (-0.076539593, 1.026567876))
            ThreePointArc((-0.076539593, 1.026567876), (-0.034129227, 0.51339783), (-0.019992438, -0.000549918))
            Line((-0.019992438, -0.000549918), (0.000549918, -0.019992438))
            ThreePointArc((0.000549918, -0.019992438), (0.514497665, -0.00585565), (1.029223113, -0.019992438))
            Line((1.029223113, -0.019992438), (1.028673195, 0))
        make_face()
    chamfer2_piece_25a = extrude(amount=113.143565976, mode=Mode.PRIVATE)
    chamfer2_piece_25a = split(chamfer2_piece_25a, bisect_by=Plane(origin=(128.379160813, -56.681906875, 196.879260813), z_dir=(-0.7071067811865476, 0, 0.7071067811865476)), keep=Keep.TOP, mode=Mode.PRIVATE)
    with BuildSketch(Plane(origin=(126.18154552, -57, 194.68164552), x_dir=(-0.7068394360706735, -0.027495876610588745, 0.7068394360706735), z_dir=(0.7071067811865476, 0, 0.7071067811865476))) as chamfer2_piece_25b_section:
        with BuildLine():
            Line((1.028673195, 0), (-0.056547155, -1.027117794))
            Line((-0.056547155, -1.027117794), (-0.076539593, -1.026567876))
            ThreePointArc((-0.076539593, -1.026567876), (-0.034129227, -0.51339783), (-0.019992438, 0.000549918))
            Line((-0.019992438, 0.000549918), (0.000549918, 0.019992438))
            ThreePointArc((0.000549918, 0.019992438), (0.514497665, 0.00585565), (1.029223113, 0.019992438))
            Line((1.029223113, 0.019992438), (1.028673195, 0))
        make_face()
    chamfer2_piece_25b = extrude(amount=13.628505929, mode=Mode.PRIVATE)
    chamfer2_piece_25b = split(chamfer2_piece_25b, bisect_by=Plane(origin=(128, -56.681906875, 195.963885635), z_dir=(-1, 0, 0)), keep=Keep.TOP, mode=Mode.PRIVATE)
    chamfer2_piece_25 = chamfer2_piece_25a & chamfer2_piece_25b
    add(chamfer2_piece_25, mode=Mode.SUBTRACT)
    with BuildSketch(Plane(origin=(6, 57, 199.071782988), x_dir=(0.9996219169112968, 0.027495876610589075, 0), z_dir=(0, 0, -1))) as chamfer2_piece_26a_section:
        with BuildLine():
            Line((1.028673195, 0), (-0.056547155, 1.027117794))
            Line((-0.056547155, 1.027117794), (-0.076539593, 1.026567876))
            ThreePointArc((-0.076539593, 1.026567876), (-0.034129227, 0.51339783), (-0.019992438, -0.000549918))
            Line((-0.019992438, -0.000549918), (0.000549918, -0.019992438))
            ThreePointArc((0.000549918, -0.019992438), (0.514497665, -0.00585565), (1.029223113, -0.019992438))
            Line((1.029223113, -0.019992438), (1.028673195, 0))
        make_face()
    chamfer2_piece_26a = extrude(amount=113.143565976, mode=Mode.PRIVATE)
    chamfer2_piece_26a = split(chamfer2_piece_26a, bisect_by=Plane(origin=(5.620839187, 56.681906875, 196.879260813), z_dir=(0.7071067811865472, 0, 0.7071067811865478)), keep=Keep.TOP, mode=Mode.PRIVATE)
    with BuildSketch(Plane(origin=(-1.81835448, 57, 204.31845448), x_dir=(0.7068394360706731, 0.027495876610588672, 0.7068394360706738), z_dir=(0.7071067811865479, 0, -0.7071067811865474))) as chamfer2_piece_26b_section:
        with BuildLine():
            Line((1.028673195, 0), (-0.056547155, 1.027117794))
            Line((-0.056547155, 1.027117794), (-0.076539593, 1.026567876))
            ThreePointArc((-0.076539593, 1.026567876), (-0.034129227, 0.51339783), (-0.019992438, -0.000549918))
            Line((-0.019992438, -0.000549918), (0.000549918, -0.019992438))
            ThreePointArc((0.000549918, -0.019992438), (0.514497665, -0.00585565), (1.029223113, -0.019992438))
            Line((1.029223113, -0.019992438), (1.028673195, 0))
        make_face()
    chamfer2_piece_26b = extrude(amount=13.628505929, mode=Mode.PRIVATE)
    chamfer2_piece_26b = split(chamfer2_piece_26b, bisect_by=Plane(origin=(6, 56.681906875, 195.963885635), z_dir=(1, 0, 0)), keep=Keep.TOP, mode=Mode.PRIVATE)
    chamfer2_piece_26 = chamfer2_piece_26a & chamfer2_piece_26b
    add(chamfer2_piece_26, mode=Mode.SUBTRACT)
    with BuildSketch(Plane(origin=(7.81845448, 57, 90.31835448), x_dir=(0.7068394360706733, 0.027495876610588946, -0.7068394360706736), z_dir=(-0.7071067811865477, 0, -0.7071067811865475))) as chamfer2_piece_27a_section:
        with BuildLine():
            Line((1.028673195, 0), (-0.056547155, 1.027117794))
            Line((-0.056547155, 1.027117794), (-0.076539593, 1.026567876))
            ThreePointArc((-0.076539593, 1.026567876), (-0.034129227, 0.51339783), (-0.019992438, -0.000549918))
            Line((-0.019992438, -0.000549918), (0.000549918, -0.019992438))
            ThreePointArc((0.000549918, -0.019992438), (0.514497665, -0.00585565), (1.029223113, -0.019992438))
            Line((1.029223113, -0.019992438), (1.028673195, 0))
        make_face()
    chamfer2_piece_27a = extrude(amount=13.628505929, mode=Mode.PRIVATE)
    chamfer2_piece_27a = split(chamfer2_piece_27a, bisect_by=Plane(origin=(6, 56.681906875, 89.036114365), z_dir=(1, 0, 0)), keep=Keep.TOP, mode=Mode.PRIVATE)
    with BuildSketch(Plane(origin=(6, 57, 199.071782988), x_dir=(0.9996219169112968, 0.027495876610589075, 0), z_dir=(0, 0, -1))) as chamfer2_piece_27b_section:
        with BuildLine():
            Line((1.028673195, 0), (-0.056547155, 1.027117794))
            Line((-0.056547155, 1.027117794), (-0.076539593, 1.026567876))
            ThreePointArc((-0.076539593, 1.026567876), (-0.034129227, 0.51339783), (-0.019992438, -0.000549918))
            Line((-0.019992438, -0.000549918), (0.000549918, -0.019992438))
            ThreePointArc((0.000549918, -0.019992438), (0.514497665, -0.00585565), (1.029223113, -0.019992438))
            Line((1.029223113, -0.019992438), (1.028673195, 0))
        make_face()
    chamfer2_piece_27b = extrude(amount=113.143565976, mode=Mode.PRIVATE)
    chamfer2_piece_27b = split(chamfer2_piece_27b, bisect_by=Plane(origin=(5.620839187, 56.681906875, 88.120739187), z_dir=(0.7071067811865475, 0, -0.7071067811865477)), keep=Keep.TOP, mode=Mode.PRIVATE)
    chamfer2_piece_27 = chamfer2_piece_27a & chamfer2_piece_27b
    add(chamfer2_piece_27, mode=Mode.SUBTRACT)
    with BuildSketch(Plane(origin=(128, 57, 199.071782988), x_dir=(-0.9996219169112968, 0.027495876610589196, 0), z_dir=(0, 0, -1))) as chamfer2_piece_28a_section:
        with BuildLine():
            Line((1.028673195, 0), (-0.056547155, -1.027117794))
            Line((-0.056547155, -1.027117794), (-0.076539593, -1.026567876))
            ThreePointArc((-0.076539593, -1.026567876), (-0.034129227, -0.51339783), (-0.019992438, 0.000549918))
            Line((-0.019992438, 0.000549918), (0.000549918, 0.019992438))
            ThreePointArc((0.000549918, 0.019992438), (0.514497665, 0.00585565), (1.029223113, 0.019992438))
            Line((1.029223113, 0.019992438), (1.028673195, 0))
        make_face()
    chamfer2_piece_28a = extrude(amount=113.143565976, mode=Mode.PRIVATE)
    chamfer2_piece_28a = split(chamfer2_piece_28a, bisect_by=Plane(origin=(128.379160813, 56.681906875, 196.879260813), z_dir=(-0.7071067811865476, 0, 0.7071067811865476)), keep=Keep.TOP, mode=Mode.PRIVATE)
    with BuildSketch(Plane(origin=(126.18154552, 57, 194.68164552), x_dir=(-0.7068394360706735, 0.027495876610588745, 0.7068394360706735), z_dir=(0.7071067811865476, 0, 0.7071067811865476))) as chamfer2_piece_28b_section:
        with BuildLine():
            Line((1.028673195, 0), (-0.056547155, 1.027117794))
            Line((-0.056547155, 1.027117794), (-0.076539593, 1.026567876))
            ThreePointArc((-0.076539593, 1.026567876), (-0.034129227, 0.51339783), (-0.019992438, -0.000549918))
            Line((-0.019992438, -0.000549918), (0.000549918, -0.019992438))
            ThreePointArc((0.000549918, -0.019992438), (0.514497665, -0.00585565), (1.029223113, -0.019992438))
            Line((1.029223113, -0.019992438), (1.028673195, 0))
        make_face()
    chamfer2_piece_28b = extrude(amount=13.628505929, mode=Mode.PRIVATE)
    chamfer2_piece_28b = split(chamfer2_piece_28b, bisect_by=Plane(origin=(128, 56.681906875, 195.963885635), z_dir=(-1, 0, 0)), keep=Keep.TOP, mode=Mode.PRIVATE)
    chamfer2_piece_28 = chamfer2_piece_28a & chamfer2_piece_28b
    add(chamfer2_piece_28, mode=Mode.SUBTRACT)
    with BuildSketch(Plane(origin=(135.81835448, 57, 80.68154552), x_dir=(0.01944252080601719, -0.9996219169112965, 0.01944252080601719), z_dir=(-0.7071067811865476, 0, 0.7071067811865476))) as chamfer2_piece_29a_section:
        with BuildLine():
            Line((1.028673195, 0), (-0.056547155, -1.027117794))
            Line((-0.056547155, -1.027117794), (-0.076539593, -1.026567876))
            ThreePointArc((-0.076539593, -1.026567876), (-0.034129227, -0.51339783), (-0.019992438, 0.000549918))
            Line((-0.019992438, 0.000549918), (0.000549918, 0.019992438))
            ThreePointArc((0.000549918, 0.019992438), (0.514497665, 0.00585565), (1.029223113, 0.019992438))
            Line((1.029223113, 0.019992438), (1.028673195, 0))
        make_face()
    chamfer2_piece_29a = extrude(amount=13.628505929, mode=Mode.PRIVATE)
    chamfer2_piece_29a = split(chamfer2_piece_29a, bisect_by=Plane(origin=(128, 56.681906875, 89.036114365), z_dir=(-1, 0, 0)), keep=Keep.TOP, mode=Mode.PRIVATE)
    with BuildSketch(Plane(origin=(128, 57, 199.071782988), x_dir=(-0.9996219169112968, 0.027495876610589196, 0), z_dir=(0, 0, -1))) as chamfer2_piece_29b_section:
        with BuildLine():
            Line((1.028673195, 0), (-0.056547155, -1.027117794))
            Line((-0.056547155, -1.027117794), (-0.076539593, -1.026567876))
            ThreePointArc((-0.076539593, -1.026567876), (-0.034129227, -0.51339783), (-0.019992438, 0.000549918))
            Line((-0.019992438, 0.000549918), (0.000549918, 0.019992438))
            ThreePointArc((0.000549918, 0.019992438), (0.514497665, 0.00585565), (1.029223113, 0.019992438))
            Line((1.029223113, 0.019992438), (1.028673195, 0))
        make_face()
    chamfer2_piece_29b = extrude(amount=113.143565976, mode=Mode.PRIVATE)
    chamfer2_piece_29b = split(chamfer2_piece_29b, bisect_by=Plane(origin=(128.379160813, 56.681906875, 88.120739187), z_dir=(-0.7071067811865476, 0, -0.7071067811865476)), keep=Keep.TOP, mode=Mode.PRIVATE)
    chamfer2_piece_29 = chamfer2_piece_29a & chamfer2_piece_29b
    add(chamfer2_piece_29, mode=Mode.SUBTRACT)

    # Chamfer3
    chamfer3_edges = [part_1.edges().sort_by_distance(p)[0] for p in [
        (134, 15.5, 221.3),
        (134, 15.5, 71.3),
        (0, 15.5, 221.3),
        (0, 15.5, 71.3),
        (134, -15.5, 221.3),
        (134, -15.5, 71.3),
        (0, -15.5, 221.3),
        (0, -15.5, 71.3),
    ]]
    chamfer(chamfer3_edges, length=CHAMFER3_SIZE)

    # Sketch11 → Cut-Extrude9 (cut, through all)
    with BuildSketch(Plane(origin=(0, 57, 0), x_dir=(1, 0, 0), z_dir=(0, 1, 0))):
        Polygon((128, -88.5), (128, -56), (124.5, -56), (124.5, -225), (128, -225), (128, -196.5), (134, -196.5), (134, -250), (0, -250), (0, 0), (134, 0), (134, -88.5), align=None)
    extrude(amount=-CUT_EXTRUDE9_DEPTH, mode=Mode.SUBTRACT)

    # Chamfer4
    chamfer4_edges = [part_1.edges().sort_by_distance(p)[0] for p in [
        (124.5, 57, 140.5),
        (124.5, -57, 140.5),
    ]]
    chamfer(chamfer4_edges, length=CHAMFER4_SIZE)

    # Sketch12 → Boss-Extrude3 (add)
    with BuildSketch(Plane(origin=(0, 57, 0), x_dir=(1, 0, 0), z_dir=(0, 1, 0))):
        with Locations((124.75, -57)):
            Rectangle(SKETCH12_W, SKETCH12_H)
    extrude(amount=-BOSS_EXTRUDE3_DEPTH)

    # Chamfer5
    chamfer5_edges = [part_1.edges().sort_by_distance(p)[0] for p in [
        (124.75, 57, 58),
        (124.75, -57, 58),
    ]]
    chamfer(chamfer5_edges, length=CHAMFER5_SIZE - 0.0001)  # a hair under: the kernel refuses the full size


solid = part_1.part
